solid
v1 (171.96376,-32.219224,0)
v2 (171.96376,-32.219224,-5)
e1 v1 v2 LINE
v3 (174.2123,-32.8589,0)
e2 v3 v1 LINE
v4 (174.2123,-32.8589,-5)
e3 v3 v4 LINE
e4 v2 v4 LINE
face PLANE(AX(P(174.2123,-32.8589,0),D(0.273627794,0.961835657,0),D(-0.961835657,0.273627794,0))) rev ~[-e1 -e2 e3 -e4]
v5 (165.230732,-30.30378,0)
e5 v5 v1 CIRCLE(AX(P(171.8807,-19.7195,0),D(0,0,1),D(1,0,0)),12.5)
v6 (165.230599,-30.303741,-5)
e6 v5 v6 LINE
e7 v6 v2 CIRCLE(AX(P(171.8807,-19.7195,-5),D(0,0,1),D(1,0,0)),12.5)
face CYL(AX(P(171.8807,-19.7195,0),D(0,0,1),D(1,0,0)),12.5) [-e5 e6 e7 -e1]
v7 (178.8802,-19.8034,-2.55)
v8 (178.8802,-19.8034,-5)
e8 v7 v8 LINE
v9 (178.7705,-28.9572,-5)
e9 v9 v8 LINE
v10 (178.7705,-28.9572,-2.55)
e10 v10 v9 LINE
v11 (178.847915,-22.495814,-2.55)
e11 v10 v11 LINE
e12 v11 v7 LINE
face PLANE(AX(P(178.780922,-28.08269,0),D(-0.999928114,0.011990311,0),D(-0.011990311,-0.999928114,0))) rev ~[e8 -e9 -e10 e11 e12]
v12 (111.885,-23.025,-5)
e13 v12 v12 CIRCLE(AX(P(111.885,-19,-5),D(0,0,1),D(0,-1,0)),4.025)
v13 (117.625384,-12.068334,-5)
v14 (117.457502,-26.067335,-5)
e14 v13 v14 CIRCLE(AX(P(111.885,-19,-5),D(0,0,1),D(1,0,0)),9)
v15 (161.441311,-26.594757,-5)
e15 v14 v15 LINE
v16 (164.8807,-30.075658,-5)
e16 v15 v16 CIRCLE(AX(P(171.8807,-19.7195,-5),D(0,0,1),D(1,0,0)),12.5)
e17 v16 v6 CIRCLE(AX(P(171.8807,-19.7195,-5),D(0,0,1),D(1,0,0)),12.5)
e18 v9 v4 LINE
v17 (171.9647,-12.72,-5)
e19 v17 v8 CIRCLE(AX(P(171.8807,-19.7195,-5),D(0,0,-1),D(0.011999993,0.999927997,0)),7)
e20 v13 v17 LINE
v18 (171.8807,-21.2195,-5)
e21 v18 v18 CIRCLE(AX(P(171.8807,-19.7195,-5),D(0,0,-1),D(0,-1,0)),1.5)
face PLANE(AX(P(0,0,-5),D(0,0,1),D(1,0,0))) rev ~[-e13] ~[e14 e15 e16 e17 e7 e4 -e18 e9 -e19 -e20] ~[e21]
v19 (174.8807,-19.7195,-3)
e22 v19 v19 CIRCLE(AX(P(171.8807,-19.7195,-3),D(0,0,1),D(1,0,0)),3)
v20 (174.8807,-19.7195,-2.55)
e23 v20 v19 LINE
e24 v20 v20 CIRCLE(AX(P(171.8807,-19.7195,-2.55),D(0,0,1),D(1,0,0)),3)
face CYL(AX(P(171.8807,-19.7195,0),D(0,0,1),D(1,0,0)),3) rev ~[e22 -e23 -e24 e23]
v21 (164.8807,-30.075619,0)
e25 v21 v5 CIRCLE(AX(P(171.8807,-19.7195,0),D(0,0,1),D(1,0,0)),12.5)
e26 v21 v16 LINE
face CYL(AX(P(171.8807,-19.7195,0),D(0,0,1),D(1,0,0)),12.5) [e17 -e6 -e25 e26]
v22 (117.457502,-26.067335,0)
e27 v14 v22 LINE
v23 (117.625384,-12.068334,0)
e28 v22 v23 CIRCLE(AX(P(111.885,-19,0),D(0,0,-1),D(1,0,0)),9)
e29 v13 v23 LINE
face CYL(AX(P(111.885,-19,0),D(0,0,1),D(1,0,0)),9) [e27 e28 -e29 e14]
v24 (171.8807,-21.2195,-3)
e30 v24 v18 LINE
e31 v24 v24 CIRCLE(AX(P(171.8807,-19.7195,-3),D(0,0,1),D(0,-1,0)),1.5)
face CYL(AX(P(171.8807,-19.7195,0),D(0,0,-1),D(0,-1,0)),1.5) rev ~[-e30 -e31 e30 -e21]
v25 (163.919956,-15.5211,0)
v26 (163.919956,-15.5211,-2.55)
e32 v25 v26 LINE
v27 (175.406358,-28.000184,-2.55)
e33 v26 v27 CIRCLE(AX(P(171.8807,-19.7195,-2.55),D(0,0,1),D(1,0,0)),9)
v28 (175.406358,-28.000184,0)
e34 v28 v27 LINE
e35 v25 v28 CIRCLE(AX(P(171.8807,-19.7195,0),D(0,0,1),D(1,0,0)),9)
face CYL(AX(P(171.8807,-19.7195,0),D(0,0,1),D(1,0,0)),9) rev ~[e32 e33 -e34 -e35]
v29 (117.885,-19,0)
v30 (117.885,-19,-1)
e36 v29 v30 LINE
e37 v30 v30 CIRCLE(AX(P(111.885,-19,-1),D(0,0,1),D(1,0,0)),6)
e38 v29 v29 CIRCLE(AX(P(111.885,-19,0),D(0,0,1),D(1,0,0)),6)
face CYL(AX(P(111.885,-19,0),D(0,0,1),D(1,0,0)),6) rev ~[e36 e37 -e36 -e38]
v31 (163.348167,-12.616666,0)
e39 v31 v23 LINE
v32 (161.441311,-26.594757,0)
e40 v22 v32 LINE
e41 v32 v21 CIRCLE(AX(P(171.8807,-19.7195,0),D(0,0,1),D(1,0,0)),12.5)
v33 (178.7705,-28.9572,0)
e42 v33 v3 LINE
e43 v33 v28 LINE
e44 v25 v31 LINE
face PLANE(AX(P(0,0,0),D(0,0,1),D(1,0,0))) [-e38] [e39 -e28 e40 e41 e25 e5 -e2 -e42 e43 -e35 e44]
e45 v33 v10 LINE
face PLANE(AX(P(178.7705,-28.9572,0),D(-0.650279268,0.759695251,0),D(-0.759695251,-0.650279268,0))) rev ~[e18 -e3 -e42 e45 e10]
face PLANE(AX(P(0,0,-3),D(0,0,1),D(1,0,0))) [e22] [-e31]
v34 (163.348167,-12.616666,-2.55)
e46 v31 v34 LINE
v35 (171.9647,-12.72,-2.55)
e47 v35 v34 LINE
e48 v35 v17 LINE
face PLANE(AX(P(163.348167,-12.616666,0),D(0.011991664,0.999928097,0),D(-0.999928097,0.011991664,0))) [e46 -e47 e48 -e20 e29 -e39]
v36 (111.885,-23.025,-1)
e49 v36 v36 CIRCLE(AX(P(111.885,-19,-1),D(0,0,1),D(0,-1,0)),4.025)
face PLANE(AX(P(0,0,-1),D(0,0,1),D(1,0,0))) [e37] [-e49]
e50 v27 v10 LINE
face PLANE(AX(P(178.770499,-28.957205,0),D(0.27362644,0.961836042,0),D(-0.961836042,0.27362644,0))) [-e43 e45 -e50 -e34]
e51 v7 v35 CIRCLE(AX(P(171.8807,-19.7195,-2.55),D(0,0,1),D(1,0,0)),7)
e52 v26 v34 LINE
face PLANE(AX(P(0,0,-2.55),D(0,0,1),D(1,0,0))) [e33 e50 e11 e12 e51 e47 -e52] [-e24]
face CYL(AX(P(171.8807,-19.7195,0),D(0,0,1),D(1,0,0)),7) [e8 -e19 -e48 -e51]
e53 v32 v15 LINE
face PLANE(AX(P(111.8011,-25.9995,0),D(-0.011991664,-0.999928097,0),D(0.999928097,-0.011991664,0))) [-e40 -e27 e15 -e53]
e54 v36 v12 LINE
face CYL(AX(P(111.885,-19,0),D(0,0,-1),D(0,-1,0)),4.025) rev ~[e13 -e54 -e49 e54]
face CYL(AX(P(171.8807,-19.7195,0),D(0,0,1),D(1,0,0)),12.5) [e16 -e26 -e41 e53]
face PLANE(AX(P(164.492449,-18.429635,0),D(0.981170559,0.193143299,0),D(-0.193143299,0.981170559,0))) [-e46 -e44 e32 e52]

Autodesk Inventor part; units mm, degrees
ref_plane "YZ Plane" through (0, 0, 0) normal (1, 0, 0) x (0, 1, 0)
ref_plane "XZ Plane" through (0, 0, 0) normal (0, 1, 0) x (-1, 0, 0)
ref_plane "XY Plane" through (0, 0, 0) normal (0, 0, 1) x (1, 0, 0)
sketch "スケッチ1" plane through (0, 0, 0) normal (0, 0, 1) x (1, 0, 0)
  line L0 (-101.5, 48) -> (108.5, 48)
  circle A0 centre (111.885, -19) radius 4
  circle A1 centre (171.8807, -19.7195) radius 4
  circle A2 centre (111.885, -19) radius 7
  circle A3 centre (171.8807, -19.7195) radius 7
  line L1 (171.8807, -19.7195) -> (111.885, -19) construction
  line L2 (171.9647, -12.72) -> (111.969, -12.0005)
  line L3 (111.8011, -25.9995) -> (171.7968, -26.719)
  arc A4 (171.7968, -26.719) -> (171.9647, -12.72) centre (171.8807, -19.7195) ccw
  arc A5 (111.969, -12.0005) -> (111.8011, -25.9995) centre (111.885, -19) ccw
  line L4 (173.7961, -12.9866) -> (250.1906, -34.7195)
  circle A6 centre (241.9819, -63.5746) radius 30
  line L5 (268.18, -78.1916) -> (221.9512, -41.2414)
  line L6 (221.9512, -41.2414) -> (169.9654, -26.4523)
  line L7 (271.9819, -113.1361) -> (271.9819, -54.8199)
  line L8 (111.885, -19) -> (111.885, 41) construction
  line L9 (118.885, -19) -> (118.885, 41)
  line L10 (104.885, 41) -> (104.885, -19)
  arc A7 (104.885, -19) -> (118.885, -19) centre (111.885, -19) ccw
  arc A8 (118.885, 41) -> (104.885, 41) centre (111.885, 41) ccw
  circle A9 centre (29.4318, 47.238) radius 30
  line L11 (113.3193, 34.1485) -> (35.5787, 17.8745)
  line L12 (-0.5585, 48) -> (57.5489, 36.7771)
  line L13 (57.5489, 36.7771) -> (110.4508, 47.8515)
  circle A10 centre (113.5, -20) radius 68
  line L14 (321.9635, -82.9551) -> (60.2705, 100.2843)
  line L15 (259.1892, -39) -> (111.885, -19)
  arc A11 (93.5924, -27.1048) -> (135.371, -5.9244) centre (95.0604, 21.7941) ccw
  arc A12 (135.371, -5.9244) -> (135.8476, -3.6716) centre (132.899, -4.2246) ccw
  arc A13 (135.8476, -3.6716) -> (83.1833, 18.5565) centre (102.1579, -9.9896) ccw
  line L16 (111.885, -19) -> (112.6892, 40.9946) construction
  line L17 (118.8844, -19.0938) -> (119.6886, 40.9008)
  line L18 (105.6898, 41.0884) -> (104.8857, -18.9062)
  arc A14 (104.8857, -18.9062) -> (118.8844, -19.0938) centre (111.885, -19) ccw
  arc A15 (119.6886, 40.9008) -> (105.6898, 41.0884) centre (112.6892, 40.9946) ccw
  line L19 (164.9949, 48) -> (164.9949, 26)
  line L20 (164.9949, 26) -> (327.4949, -102)
  circle A16 centre (116.2926, -40) radius 68
  circle A17 centre (-98.885, 0) radius 67.5
  line L21 (321.3633, -8.501) -> (-152.6681, 78.4982)
  line L22 (104.8897, -3) -> (104.8897, 0)
  line L23 (104.8897, -3) -> (72.0656, -3)
  line L24 (72.0656, 0) -> (104.8897, 0)
  circle A18 centre (83.3769, -17.5) radius 13.85
  line L25 (178.7705, -28.9572) -> (174.2123, -32.8589)
  line L26 (174.2123, -32.8589) -> (164.8807, -30.2042)
  line L27 (164.8807, -30.2042) -> (164.8807, -19.7195)
  line L28 (169.9654, -26.4523) -> (168.5972, -31.2615)
  line L29 (168.5972, -31.2615) -> (164.8807, -26.636)
  line L30 (178.8802, -19.8034) -> (178.6547, -38.6089)
  line L31 (165.0125, -21.0715) -> (158.1724, 13.6763)
  circle A19 centre (171.8807, -19.7195) radius 7.5
  point P0 (0, 0)
  point P1 (141.8829, -19.3597)
  point P2 (111.885, 11)
  point P3 (105.885, 0)
  point P4 (105.885, 0)
  point P5 (23.7328, -42.729)
  point P6 (112.2871, 10.9973)
  point P7 (169.2723, -12.6877)
  point P8 (163.3482, -12.6166)
  point P9 (164.4925, -18.4296)
  point P10 (172.5552, -27.1891)
  point P11 (178.8479, -22.4958)
  dimension "d0" = 8
  dimension "d1" = 8
  dimension "d2" = 3
  dimension "d3" = 3
  dimension "d4" = 60
  dimension "d5" = 14
  dimension "d6" = 14
  dimension "d7" = 60
  dimension "d8" = 14
  dimension "d9" = 60
  dimension "d10" = 14
  dimension "d11" = 6
  dimension "d12" = 35
  dimension "d13" = 13.271
  dimension "d14" = 14
  dimension "d15" = 20
  dimension "d16" = 15
  dimension "d17" = 22
  dimension "d18" = 150
  dimension "d19" = 162.5
  dimension "d20" = 0
  dimension "d21" = 136
  dimension "d22" = 136
  dimension "d23" = 135
  dimension "d24" = 38.227
  dimension "d25" = 18
  dimension "d27" = 5
  dimension "d28" = 6
  dimension "d30" = 101.823
  dimension "d31" = 101.823
  dimension "d32" = 0.5
extrude "押し出し1" add sketch "スケッチ1" against normal blind 5 contours L25 L26 L28 A19 L15 L6 | L6 L15 L30 | L15 A19 L6 | L6 A19 L30 L15 | A19 L15 L28 L3 L6 | L6 L3 A3 L30 A19 | A19 L28 L15 | L29 L3 L15 A19 L28 | L26 L27 L29 | A2 A11 | L6 A3 L3 | L3 L28 L6 | L28 A19 L15 | L15 A19 L3 L28 | L27 L15 L3 | L3 A2 A11 L15 L27 | A3 | L9 A2 L2 | L2 L17 L9 | L3 A19 L27 L31 A3 L28 | L15 L3 A19 | A2 A11 | L15 L27 A19 L3 | L15 A11 L2 L31 A19 L27 | A19 L31 L2 | L2 A3 L27 L31 A19 | L2 A11 L15 A2 L17 | L31 L27 A3 | A2 L15 A11 | A19 L31 L27 | A0 | A1
extrude "押し出し2" cut sketch "スケッチ1" against normal blind 2.55 contours L6 L15 L30 | L6 A19 L30 L15 | A19 L15 L28 L3 L6 | L6 L3 A3 L30 A19 | A19 L28 L15 | L30 A3 L4 A19 | L6 A3 L3 | L3 L28 L6 | L28 A19 L15 | L15 A19 L3 L28 | A3 | L4 A3 L2 A19 | L3 A19 L27 L31 A3 L28 | A19 L31 L2 | L2 A3 L27 L31 A19 | L31 L27 A3 | A19 L31 L27 | A1
hole "穴1" at (105.885, 0, 0) at (23.7328, -42.729, 0) at (116.2926, -40, 0) at (-98.885, 0, 0) at (171.8807, -19.7195, 0) direction (0, 0, -1) diameter 3 depth 12 tip angle 118
sketch "スケッチ2" plane through (0, 0, 0) normal (0, 0, 1) x (1, 0, 0)
  line L0 (163.3482, -12.6166) -> (164.4925, -18.4296) projected
  arc A0 (164.4925, -18.4296) -> (172.5552, -27.1891) centre (171.8807, -19.7195) ccw projected
  line L1 (172.5552, -27.1891) -> (178.7705, -28.9572) projected
  line L2 (178.7705, -28.9572) -> (174.2123, -32.8589) projected
  line L3 (174.2123, -32.8589) -> (164.8807, -30.2042) projected
  line L4 (164.8807, -30.2042) -> (164.8807, -26.636) projected
  line L5 (164.8807, -26.636) -> (111.8011, -25.9995) projected
  arc A1 (111.969, -12.0005) -> (111.8011, -25.9995) centre (111.885, -19) ccw projected
  line L6 (111.969, -12.0005) -> (163.3482, -12.6166) projected
  circle A2 centre (171.8807, -19.7195) radius 7.5
  circle A3 centre (171.8807, -19.7195) radius 12.5
  point P0 (0, 0)
  point P1 (161.4414, -26.5948)
  point P2 (164.8807, -30.0756)
  point P3 (165.2308, -30.3038)
  point P4 (171.9637, -32.2192)
  dimension "d44" = 5
extrude "押し出し3" add sketch "スケッチ2" against normal blind 5 contours L5 L4 A3 | A3 L3
sketch "スケッチ3" plane through (0, 0, 0) normal (0, 0, 1) x (1, 0, 0)
  line L0 (163.3482, -12.6166) -> (164.4925, -18.4296) projected
  arc A0 (164.4925, -18.4296) -> (172.5552, -27.1891) centre (171.8807, -19.7195) ccw projected
  line L1 (172.5552, -27.1891) -> (178.7705, -28.9572) projected
  line L2 (178.7705, -28.9572) -> (174.2123, -32.8589) projected
  line L3 (174.2123, -32.8589) -> (171.9637, -32.2192) projected
  arc A1 (165.2308, -30.3038) -> (171.9637, -32.2192) centre (171.8807, -19.7195) ccw projected
  line L4 (165.2308, -30.3038) -> (164.8807, -30.2042) projected
  line L5 (164.8807, -30.2042) -> (164.8807, -30.0756) projected
  arc A2 (161.4414, -26.5948) -> (164.8807, -30.0756) centre (171.8807, -19.7195) ccw projected
  line L6 (161.4414, -26.5948) -> (111.8011, -25.9995) projected
  arc A3 (111.969, -12.0005) -> (111.8011, -25.9995) centre (111.885, -19) ccw projected
  line L7 (111.969, -12.0005) -> (163.3482, -12.6166) projected
  circle A4 centre (171.8807, -19.7195) radius 12.5
  point P0 (0, 0)
  point P1 (165.2308, -30.3038)
extrude "押し出し4" cut sketch "スケッチ3" against normal blind 10 contours A4 L4 L5
hole "穴2" at (105.885, 0, 0) at (111.885, -19, 0) direction (0, 0, -1) diameter 8.05 depth 12 tip angle 118
sketch "スケッチ4" plane through (0, 0, 0) normal (0, 0, 1) x (1, 0, 0)
  circle A0 centre (111.885, -19) radius 4.025 projected
  line L0 (163.3482, -12.6166) -> (164.4925, -18.4296) projected
  arc A1 (164.4925, -18.4296) -> (172.5552, -27.1891) centre (171.8807, -19.7195) ccw projected
  line L1 (172.5552, -27.1891) -> (178.7705, -28.9572) projected
  line L2 (178.7705, -28.9572) -> (174.2123, -32.8589) projected
  line L3 (174.2123, -32.8589) -> (171.9637, -32.2192) projected
  arc A2 (161.4414, -26.5948) -> (171.9637, -32.2192) centre (171.8807, -19.7195) ccw projected
  line L4 (161.4414, -26.5948) -> (111.8011, -25.9995) projected
  arc A3 (111.969, -12.0005) -> (111.8011, -25.9995) centre (111.885, -19) ccw projected
  line L5 (111.969, -12.0005) -> (163.3482, -12.6166) projected
  arc A4 (164.4925, -18.4296) -> (172.5552, -27.1891) centre (171.8807, -19.7195) ccw projected
  circle A5 centre (171.8807, -19.7195) radius 7.5
  circle A6 centre (171.8807, -19.7195) radius 9
  line L6 (178.7705, -28.9572) -> (172.5552, -27.1891) projected
  line L7 (164.4925, -18.4296) -> (163.3482, -12.6166) projected
  circle A7 centre (111.885, -19) radius 9
  point P0 (0, 0)
  point P1 (175.4063, -28.0002)
  point P2 (163.9203, -15.5231)
  point P3 (163.92, -15.5211)
  point P4 (175.4063, -28.0002)
  dimension "d56" = 15
  dimension "d57" = 1.5
  dimension "d58" = 18
extrude "押し出し5" add sketch "スケッチ4" against normal blind 5 contours A7 L4 A3 L5 | L5 A3 L4 A7
extrude "押し出し6" cut sketch "スケッチ4" against normal blind 2.55 contours L0 A1 L1 A6
sketch "スケッチ5" plane through (0, 0, 0) normal (0, 0, 1) x (1, 0, 0)
  arc A0 (117.6254, -12.0683) -> (117.4576, -26.0673) centre (111.885, -19) ccw projected
  line L0 (117.6254, -12.0683) -> (163.3482, -12.6166) projected
  line L1 (163.3482, -12.6166) -> (163.92, -15.5211) projected
  arc A1 (163.92, -15.5211) -> (175.4063, -28.0002) centre (171.8807, -19.7195) ccw projected
  line L2 (175.4063, -28.0002) -> (178.7705, -28.9572) projected
  line L3 (178.7705, -28.9572) -> (174.2123, -32.8589) projected
  line L4 (174.2123, -32.8589) -> (171.9637, -32.2192) projected
  arc A2 (161.4414, -26.5948) -> (171.9637, -32.2192) centre (171.8807, -19.7195) ccw projected
  line L5 (161.4414, -26.5948) -> (117.4576, -26.0673) projected
  circle A3 centre (111.885, -19) radius 4.025 projected
  circle A4 centre (111.885, -19) radius 6
  point P0 (0, 0)
  dimension "d63" = 12
extrude "押し出し7" cut sketch "スケッチ5" against normal blind 1 contours A4
sketch "スケッチ6" plane through (0, 0, 0) normal (0, 0, 1) x (1, 0, 0)
  circle A0 centre (111.885, -19) radius 6 projected
  arc A1 (161.4414, -26.5948) -> (171.9637, -32.2192) centre (171.8807, -19.7195) ccw projected
  line L0 (161.4414, -26.5948) -> (117.4576, -26.0673) projected
  arc A2 (117.6254, -12.0683) -> (117.4576, -26.0673) centre (111.885, -19) ccw projected
  line L1 (117.6254, -12.0683) -> (163.3482, -12.6166) projected
  line L2 (163.3482, -12.6166) -> (163.92, -15.5211) projected
  arc A3 (163.92, -15.5211) -> (175.4063, -28.0002) centre (171.8807, -19.7195) ccw projected
  line L3 (175.4063, -28.0002) -> (178.7705, -28.9572) projected
  line L4 (178.7705, -28.9572) -> (174.2123, -32.8589) projected
  line L5 (174.2123, -32.8589) -> (171.9637, -32.2192) projected
  circle A4 centre (171.8807, -19.7195) radius 1.5 projected
  circle A5 centre (171.8807, -19.7195) radius 3
  point P0 (0, 0)
  dimension "d66" = 6
extrude "押し出し8" cut sketch "スケッチ6" against normal blind 3 contours A5
equation "\"d9\" = d7"
equation "\"d31\" = d30"
properties part number "後ろウィング中間"
